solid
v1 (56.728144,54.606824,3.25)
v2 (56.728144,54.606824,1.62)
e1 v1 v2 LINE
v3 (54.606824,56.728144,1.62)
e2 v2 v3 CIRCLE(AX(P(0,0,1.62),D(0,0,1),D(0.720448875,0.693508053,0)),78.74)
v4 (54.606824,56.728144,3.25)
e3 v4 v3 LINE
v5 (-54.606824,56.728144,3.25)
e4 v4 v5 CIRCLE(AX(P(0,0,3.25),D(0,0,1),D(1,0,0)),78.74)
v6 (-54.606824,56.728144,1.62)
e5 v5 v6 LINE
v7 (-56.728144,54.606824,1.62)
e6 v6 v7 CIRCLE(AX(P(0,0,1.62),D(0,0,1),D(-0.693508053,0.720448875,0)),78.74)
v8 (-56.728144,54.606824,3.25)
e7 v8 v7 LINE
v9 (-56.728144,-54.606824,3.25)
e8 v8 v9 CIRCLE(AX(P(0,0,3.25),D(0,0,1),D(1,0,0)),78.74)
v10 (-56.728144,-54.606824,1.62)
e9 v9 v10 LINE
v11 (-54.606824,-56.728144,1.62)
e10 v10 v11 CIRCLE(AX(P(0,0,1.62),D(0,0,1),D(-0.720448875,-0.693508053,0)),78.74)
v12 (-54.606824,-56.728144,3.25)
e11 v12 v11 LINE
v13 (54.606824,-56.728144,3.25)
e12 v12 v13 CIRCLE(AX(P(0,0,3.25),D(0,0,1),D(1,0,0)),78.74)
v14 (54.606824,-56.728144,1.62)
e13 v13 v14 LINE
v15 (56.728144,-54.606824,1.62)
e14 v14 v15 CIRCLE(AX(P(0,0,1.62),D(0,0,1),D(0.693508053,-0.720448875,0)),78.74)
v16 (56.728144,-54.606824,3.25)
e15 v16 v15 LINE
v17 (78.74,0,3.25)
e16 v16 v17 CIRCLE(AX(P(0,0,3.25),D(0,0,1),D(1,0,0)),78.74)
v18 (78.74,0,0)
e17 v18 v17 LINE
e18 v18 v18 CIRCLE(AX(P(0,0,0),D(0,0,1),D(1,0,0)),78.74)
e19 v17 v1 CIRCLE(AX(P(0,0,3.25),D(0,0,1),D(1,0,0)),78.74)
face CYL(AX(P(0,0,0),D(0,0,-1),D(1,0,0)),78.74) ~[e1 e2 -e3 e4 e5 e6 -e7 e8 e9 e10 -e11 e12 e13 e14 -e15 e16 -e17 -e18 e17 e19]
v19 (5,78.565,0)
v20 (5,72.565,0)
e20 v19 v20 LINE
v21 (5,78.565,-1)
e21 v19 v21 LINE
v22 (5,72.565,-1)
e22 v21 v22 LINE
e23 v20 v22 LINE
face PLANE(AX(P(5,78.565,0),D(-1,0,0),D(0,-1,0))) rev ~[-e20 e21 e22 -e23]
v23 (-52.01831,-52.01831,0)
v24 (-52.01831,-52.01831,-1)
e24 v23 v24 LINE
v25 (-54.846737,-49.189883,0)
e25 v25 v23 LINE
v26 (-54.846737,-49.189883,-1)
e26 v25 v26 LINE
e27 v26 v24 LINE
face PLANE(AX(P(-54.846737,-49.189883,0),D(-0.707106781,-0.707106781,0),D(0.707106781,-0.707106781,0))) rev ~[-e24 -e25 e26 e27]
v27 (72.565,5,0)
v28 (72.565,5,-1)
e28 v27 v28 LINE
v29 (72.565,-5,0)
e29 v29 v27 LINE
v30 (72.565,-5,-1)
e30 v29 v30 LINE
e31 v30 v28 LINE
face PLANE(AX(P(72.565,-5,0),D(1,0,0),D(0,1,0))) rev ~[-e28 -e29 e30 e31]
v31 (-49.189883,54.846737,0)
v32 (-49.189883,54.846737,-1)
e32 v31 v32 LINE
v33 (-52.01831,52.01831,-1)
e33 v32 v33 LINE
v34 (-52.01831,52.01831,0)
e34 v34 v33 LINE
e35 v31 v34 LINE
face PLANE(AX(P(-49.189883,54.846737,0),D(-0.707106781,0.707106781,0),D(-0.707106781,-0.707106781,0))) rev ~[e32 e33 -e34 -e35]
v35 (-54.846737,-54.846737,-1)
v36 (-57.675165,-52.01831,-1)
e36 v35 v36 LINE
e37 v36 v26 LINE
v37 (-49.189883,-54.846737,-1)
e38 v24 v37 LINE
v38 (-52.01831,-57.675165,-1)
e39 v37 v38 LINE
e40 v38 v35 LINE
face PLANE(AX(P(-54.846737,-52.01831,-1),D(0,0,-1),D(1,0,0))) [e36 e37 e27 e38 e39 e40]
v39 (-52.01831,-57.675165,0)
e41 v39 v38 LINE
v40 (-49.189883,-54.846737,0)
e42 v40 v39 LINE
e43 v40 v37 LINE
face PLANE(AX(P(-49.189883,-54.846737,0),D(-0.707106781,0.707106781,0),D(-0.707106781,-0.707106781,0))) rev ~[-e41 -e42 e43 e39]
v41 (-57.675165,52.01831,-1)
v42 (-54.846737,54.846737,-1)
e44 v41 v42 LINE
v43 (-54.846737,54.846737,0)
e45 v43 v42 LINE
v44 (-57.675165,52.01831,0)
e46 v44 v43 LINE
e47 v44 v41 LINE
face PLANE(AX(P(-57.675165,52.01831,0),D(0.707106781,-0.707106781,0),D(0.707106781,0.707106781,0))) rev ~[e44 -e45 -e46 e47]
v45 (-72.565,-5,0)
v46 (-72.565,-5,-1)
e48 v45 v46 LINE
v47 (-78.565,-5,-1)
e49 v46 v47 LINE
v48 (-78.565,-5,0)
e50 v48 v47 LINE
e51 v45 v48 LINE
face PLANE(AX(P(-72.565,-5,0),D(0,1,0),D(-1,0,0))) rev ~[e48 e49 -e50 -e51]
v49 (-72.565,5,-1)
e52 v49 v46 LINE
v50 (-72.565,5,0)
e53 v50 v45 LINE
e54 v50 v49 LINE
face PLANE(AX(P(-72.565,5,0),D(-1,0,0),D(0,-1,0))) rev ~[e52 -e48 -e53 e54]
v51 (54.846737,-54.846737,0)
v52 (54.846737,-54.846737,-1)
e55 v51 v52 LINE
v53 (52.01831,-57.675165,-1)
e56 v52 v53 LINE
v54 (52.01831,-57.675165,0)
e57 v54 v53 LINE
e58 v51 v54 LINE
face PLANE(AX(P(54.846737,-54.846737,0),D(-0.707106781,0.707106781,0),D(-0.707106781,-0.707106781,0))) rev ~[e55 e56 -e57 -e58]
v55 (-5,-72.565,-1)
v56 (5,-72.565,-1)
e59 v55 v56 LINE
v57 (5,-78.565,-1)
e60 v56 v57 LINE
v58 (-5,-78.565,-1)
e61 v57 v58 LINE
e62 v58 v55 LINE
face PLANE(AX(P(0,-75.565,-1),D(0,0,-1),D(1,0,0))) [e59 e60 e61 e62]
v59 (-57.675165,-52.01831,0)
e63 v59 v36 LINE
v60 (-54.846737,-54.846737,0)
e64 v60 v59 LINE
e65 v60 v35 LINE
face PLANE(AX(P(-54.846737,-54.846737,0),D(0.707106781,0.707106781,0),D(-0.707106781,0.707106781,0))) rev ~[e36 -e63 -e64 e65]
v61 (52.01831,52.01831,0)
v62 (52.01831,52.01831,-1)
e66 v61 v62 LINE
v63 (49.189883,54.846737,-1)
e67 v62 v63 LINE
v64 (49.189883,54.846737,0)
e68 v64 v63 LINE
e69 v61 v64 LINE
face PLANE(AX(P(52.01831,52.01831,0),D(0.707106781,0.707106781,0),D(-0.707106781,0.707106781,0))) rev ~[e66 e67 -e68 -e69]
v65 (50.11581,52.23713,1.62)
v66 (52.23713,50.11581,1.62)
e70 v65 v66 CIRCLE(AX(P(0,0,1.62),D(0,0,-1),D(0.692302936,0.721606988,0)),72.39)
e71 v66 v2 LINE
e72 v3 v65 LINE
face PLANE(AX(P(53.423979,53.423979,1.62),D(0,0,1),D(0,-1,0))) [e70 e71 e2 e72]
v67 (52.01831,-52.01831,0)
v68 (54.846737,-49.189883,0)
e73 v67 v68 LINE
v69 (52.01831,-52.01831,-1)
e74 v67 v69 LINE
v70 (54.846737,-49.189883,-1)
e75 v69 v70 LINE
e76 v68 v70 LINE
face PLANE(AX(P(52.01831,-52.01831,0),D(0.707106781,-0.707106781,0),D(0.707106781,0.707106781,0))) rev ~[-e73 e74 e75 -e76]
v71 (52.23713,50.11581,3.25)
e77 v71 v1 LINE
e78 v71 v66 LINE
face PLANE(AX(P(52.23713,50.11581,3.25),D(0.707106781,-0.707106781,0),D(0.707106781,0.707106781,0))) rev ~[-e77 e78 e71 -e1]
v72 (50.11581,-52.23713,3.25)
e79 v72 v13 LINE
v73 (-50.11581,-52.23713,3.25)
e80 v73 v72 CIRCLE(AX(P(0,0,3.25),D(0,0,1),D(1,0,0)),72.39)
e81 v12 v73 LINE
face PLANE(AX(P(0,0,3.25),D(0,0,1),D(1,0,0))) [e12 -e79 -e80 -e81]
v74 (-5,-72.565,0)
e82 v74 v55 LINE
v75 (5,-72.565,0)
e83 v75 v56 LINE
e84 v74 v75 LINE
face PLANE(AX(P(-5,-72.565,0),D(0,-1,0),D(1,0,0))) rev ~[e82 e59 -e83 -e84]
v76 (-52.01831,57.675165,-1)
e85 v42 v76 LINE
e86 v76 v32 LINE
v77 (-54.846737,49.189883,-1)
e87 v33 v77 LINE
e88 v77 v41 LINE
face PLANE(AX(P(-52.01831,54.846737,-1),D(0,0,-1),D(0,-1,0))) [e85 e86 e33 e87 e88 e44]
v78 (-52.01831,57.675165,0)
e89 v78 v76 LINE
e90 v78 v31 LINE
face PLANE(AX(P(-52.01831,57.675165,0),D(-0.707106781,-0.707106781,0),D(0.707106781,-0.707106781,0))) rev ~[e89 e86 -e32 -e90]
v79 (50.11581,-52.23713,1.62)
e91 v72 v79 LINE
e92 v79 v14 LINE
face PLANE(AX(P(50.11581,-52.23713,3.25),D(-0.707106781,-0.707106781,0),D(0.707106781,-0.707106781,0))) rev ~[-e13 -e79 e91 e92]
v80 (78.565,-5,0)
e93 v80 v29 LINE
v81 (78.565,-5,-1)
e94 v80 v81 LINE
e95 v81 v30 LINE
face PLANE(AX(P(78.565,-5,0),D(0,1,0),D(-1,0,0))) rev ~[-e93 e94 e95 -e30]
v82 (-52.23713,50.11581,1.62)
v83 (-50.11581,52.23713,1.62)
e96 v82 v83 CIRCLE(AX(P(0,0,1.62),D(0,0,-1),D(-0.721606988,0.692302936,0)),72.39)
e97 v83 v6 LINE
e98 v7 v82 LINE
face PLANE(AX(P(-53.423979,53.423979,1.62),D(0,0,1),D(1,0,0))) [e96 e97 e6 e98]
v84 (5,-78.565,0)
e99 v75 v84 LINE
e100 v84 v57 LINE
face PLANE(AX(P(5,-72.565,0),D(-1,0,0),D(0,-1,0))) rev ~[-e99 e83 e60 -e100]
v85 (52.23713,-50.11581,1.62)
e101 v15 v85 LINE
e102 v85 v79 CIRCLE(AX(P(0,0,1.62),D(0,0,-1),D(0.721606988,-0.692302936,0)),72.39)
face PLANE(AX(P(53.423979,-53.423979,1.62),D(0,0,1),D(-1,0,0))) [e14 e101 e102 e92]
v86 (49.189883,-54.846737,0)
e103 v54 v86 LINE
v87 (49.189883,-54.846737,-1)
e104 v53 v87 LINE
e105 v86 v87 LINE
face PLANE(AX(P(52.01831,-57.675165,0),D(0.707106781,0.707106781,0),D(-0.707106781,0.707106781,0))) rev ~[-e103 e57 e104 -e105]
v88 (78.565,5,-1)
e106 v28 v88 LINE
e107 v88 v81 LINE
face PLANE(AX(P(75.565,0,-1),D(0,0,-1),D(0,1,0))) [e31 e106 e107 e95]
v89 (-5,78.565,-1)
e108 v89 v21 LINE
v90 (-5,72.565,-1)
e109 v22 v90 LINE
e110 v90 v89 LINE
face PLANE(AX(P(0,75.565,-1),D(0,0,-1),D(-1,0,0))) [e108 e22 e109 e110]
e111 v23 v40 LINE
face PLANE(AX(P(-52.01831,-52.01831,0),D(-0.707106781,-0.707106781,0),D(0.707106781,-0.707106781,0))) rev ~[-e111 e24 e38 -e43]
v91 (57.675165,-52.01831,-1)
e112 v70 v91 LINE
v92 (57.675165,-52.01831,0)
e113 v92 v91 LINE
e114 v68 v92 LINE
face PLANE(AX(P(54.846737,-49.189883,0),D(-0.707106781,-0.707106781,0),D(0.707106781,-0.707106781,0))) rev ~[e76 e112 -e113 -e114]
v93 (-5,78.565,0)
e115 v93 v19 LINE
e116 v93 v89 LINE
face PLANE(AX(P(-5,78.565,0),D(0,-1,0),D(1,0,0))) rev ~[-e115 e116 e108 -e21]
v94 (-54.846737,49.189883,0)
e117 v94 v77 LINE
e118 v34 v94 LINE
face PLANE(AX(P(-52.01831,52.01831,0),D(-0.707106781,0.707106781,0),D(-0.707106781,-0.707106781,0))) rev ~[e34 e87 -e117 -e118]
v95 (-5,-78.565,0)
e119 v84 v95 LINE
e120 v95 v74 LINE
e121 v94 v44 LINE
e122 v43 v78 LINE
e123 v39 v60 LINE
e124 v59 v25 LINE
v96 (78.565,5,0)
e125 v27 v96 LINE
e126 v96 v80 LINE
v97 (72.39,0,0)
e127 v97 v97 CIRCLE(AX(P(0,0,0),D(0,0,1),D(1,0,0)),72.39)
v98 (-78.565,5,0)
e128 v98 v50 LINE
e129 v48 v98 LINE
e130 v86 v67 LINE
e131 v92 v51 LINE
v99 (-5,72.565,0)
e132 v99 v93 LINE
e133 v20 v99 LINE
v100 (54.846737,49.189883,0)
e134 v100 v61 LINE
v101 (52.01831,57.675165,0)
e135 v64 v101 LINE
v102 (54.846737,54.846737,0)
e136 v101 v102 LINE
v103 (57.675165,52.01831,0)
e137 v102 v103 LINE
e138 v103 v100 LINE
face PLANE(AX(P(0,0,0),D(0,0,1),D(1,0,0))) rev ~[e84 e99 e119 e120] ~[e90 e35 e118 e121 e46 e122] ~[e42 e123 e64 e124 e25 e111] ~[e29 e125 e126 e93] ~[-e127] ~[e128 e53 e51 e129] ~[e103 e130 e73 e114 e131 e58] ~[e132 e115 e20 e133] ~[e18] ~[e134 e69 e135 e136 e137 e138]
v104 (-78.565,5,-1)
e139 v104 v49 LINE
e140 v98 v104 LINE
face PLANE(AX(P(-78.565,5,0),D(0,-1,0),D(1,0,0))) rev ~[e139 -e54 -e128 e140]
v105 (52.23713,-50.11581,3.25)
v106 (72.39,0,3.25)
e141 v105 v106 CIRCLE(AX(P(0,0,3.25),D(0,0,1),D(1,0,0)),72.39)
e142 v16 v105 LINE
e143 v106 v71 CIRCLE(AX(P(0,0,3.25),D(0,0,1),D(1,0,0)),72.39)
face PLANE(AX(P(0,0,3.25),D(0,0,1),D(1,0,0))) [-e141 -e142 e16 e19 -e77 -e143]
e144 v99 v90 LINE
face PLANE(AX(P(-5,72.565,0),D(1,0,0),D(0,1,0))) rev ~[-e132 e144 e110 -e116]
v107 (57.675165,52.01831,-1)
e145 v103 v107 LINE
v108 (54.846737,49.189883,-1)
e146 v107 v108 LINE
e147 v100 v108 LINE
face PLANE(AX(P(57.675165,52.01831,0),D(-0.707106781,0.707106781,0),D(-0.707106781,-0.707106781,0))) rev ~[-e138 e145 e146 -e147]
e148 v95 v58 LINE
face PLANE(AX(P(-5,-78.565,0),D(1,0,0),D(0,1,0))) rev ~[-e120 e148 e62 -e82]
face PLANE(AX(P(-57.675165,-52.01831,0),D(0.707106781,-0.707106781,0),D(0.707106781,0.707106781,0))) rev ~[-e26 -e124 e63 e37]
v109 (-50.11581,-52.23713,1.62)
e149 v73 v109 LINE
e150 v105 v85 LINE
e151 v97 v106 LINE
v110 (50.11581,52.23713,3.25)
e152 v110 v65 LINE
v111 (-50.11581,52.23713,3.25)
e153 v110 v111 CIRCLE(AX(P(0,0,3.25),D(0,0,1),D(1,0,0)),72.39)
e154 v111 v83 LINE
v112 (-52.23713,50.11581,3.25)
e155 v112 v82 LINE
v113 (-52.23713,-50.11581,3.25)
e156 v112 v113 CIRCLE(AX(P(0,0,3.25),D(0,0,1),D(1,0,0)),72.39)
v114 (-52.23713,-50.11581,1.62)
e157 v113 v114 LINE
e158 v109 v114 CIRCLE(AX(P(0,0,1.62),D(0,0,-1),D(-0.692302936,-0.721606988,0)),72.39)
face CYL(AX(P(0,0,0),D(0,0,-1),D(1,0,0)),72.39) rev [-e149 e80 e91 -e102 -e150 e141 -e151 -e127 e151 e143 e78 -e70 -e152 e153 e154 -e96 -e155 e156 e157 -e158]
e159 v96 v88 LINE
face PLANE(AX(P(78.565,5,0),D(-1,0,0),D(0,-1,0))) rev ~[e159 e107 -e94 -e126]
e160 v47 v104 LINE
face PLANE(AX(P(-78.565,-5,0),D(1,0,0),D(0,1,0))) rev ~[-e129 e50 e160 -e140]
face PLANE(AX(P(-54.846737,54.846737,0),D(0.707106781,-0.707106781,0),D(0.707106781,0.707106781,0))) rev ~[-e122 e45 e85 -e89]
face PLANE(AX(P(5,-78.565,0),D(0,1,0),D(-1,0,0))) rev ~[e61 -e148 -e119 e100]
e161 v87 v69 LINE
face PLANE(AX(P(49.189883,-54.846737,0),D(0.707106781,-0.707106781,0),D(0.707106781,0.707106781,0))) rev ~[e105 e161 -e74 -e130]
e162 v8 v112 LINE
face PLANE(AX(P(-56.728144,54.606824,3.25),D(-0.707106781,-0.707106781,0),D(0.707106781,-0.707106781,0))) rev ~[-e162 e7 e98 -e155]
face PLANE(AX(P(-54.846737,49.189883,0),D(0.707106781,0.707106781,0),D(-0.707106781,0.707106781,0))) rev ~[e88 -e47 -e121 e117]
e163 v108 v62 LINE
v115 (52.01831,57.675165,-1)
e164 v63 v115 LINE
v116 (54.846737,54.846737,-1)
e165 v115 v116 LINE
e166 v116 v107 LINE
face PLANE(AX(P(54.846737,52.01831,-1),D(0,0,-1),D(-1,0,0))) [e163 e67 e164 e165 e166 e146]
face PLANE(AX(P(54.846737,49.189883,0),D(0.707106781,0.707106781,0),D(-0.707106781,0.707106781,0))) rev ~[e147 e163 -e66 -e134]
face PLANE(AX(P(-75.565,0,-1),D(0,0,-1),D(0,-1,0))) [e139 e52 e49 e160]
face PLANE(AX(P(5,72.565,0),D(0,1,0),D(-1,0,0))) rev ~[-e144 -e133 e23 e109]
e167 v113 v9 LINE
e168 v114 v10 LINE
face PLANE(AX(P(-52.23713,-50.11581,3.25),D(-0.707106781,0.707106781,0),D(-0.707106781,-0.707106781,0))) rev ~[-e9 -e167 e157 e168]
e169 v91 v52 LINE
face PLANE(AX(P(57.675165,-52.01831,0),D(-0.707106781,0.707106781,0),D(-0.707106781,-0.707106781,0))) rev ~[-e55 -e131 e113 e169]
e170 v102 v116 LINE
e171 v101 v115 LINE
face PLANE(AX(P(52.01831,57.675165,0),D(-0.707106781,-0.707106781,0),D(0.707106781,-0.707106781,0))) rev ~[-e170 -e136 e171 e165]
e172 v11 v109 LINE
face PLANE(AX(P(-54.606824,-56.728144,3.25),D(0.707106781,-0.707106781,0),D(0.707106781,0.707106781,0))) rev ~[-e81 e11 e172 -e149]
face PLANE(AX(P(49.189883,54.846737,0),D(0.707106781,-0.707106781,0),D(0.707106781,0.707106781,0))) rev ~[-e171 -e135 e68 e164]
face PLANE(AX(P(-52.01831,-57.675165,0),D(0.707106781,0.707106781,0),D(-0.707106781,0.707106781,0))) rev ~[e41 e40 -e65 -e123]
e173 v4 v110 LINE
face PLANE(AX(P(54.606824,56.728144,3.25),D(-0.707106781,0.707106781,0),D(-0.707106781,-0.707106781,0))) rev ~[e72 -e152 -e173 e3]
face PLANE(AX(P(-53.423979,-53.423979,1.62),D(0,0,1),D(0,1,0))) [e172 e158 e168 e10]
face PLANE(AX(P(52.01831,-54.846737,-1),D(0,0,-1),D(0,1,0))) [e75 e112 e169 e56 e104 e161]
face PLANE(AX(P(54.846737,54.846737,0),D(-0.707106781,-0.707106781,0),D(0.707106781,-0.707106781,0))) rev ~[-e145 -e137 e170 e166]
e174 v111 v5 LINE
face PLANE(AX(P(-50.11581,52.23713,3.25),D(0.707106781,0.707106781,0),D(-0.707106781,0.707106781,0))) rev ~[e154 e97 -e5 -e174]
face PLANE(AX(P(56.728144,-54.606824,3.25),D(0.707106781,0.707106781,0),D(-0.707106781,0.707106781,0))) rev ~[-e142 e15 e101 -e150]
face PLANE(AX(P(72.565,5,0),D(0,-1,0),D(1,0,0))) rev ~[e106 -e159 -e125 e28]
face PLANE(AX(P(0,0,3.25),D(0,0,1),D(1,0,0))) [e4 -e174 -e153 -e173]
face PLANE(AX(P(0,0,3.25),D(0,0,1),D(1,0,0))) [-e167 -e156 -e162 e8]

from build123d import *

# Parameters (mm, degrees)
F0_R            = 78.74
F0_R_2          = 72.39
F1_DEPTH        = 3.25
F3_DEPTH        = 1.63
F3_COPIES_COUNT = 4
F6_DEPTH        = 1
F7_COUNT        = 4
F7_ANGLE        = 270
F9_DEPTH        = 1
F10_COUNT       = 4
F10_ANGLE       = 270


# Not quite as in the source:
# - a feature of the source that left no trace in its solid (it failed there, or was rolled back) is left out
# - a pattern or mirror of a feature is missing from the dataset's text; its kind, count and spacing are read off the source's solid


with BuildPart() as f1:
    # F0 (on Top) → F1 (new body)
    with BuildSketch(Plane.XY):
        Circle(F0_R)
        Circle(F0_R_2, mode=Mode.SUBTRACT)
    extrude(amount=F1_DEPTH)

    # F2 (on face) → F3 (cut)
    with BuildSketch(Plane.XY.offset(3.25)):
        with BuildLine():
            Line((-50.1158095189, 52.2371298624), (-54.6068240538, 56.7281443973))
            ThreePointArc((-54.6068240538, 56.7281443973), (-55.6775879506, 55.6775879506), (-56.7281443973, 54.6068240538))
            Line((-56.7281443973, 54.6068240538), (-52.2371298624, 50.1158095189))
            ThreePointArc((-52.2371298624, 50.1158095189), (-51.1874598901, 51.1874598901), (-50.1158095189, 52.2371298624))
        make_face()
    f3 = extrude(amount=-F3_DEPTH, mode=Mode.SUBTRACT)

    # F3_copies: F3 ×4 about axis
    f3_copies_axis = Axis((0, 0, 0), (0, 0, 1))
    for i in range(1, F3_COPIES_COUNT):
        add(f3.rotate(f3_copies_axis, i * 360 / F3_COPIES_COUNT), mode=Mode.SUBTRACT)

    # F5 (on face) → F6 (join)
    with BuildSketch(Plane(origin=(0, 0, 0), x_dir=(1, 0, 0), z_dir=(0, 0, -1))):
        Polygon((-54.8467374827, 49.1898832332), (-52.018310358, 52.018310358), (-54.8467374827, 54.8467374827), (-57.6751646075, 52.018310358), (-56.2609510451, 50.6040967956), align=None)
        Polygon((-54.8467374827, 54.8467374827), (-52.018310358, 52.018310358), (-49.1898832332, 54.8467374827), (-50.6040967956, 56.2609510451), (-52.018310358, 57.6751646075), align=None)
    f6 = extrude(amount=F6_DEPTH)

    # F7: F6 ×4 about axis
    f7_axis = Axis((0, 0, 0), (0, 0, -1))
    for i in range(1, F7_COUNT):
        add(f6.rotate(f7_axis, i * F7_ANGLE / (F7_COUNT - 1)))

    # F8 (on face) → F9 (join)
    with BuildSketch(Plane(origin=(0, 0, 0), x_dir=(1, 0, 0), z_dir=(0, 0, -1))):
        Polygon((-5, 78.565), (-5, 75.565), (-5, 72.565), (0, 72.565), (5, 72.565), (5, 75.565), (5, 78.565), (0, 78.565), align=None)
    f9 = extrude(amount=F9_DEPTH)

    # F10: F9 ×4 about axis
    f10_axis = Axis((0, 0, 0), (0, 0, 1))
    for i in range(1, F10_COUNT):
        add(f9.rotate(f10_axis, i * F10_ANGLE / (F10_COUNT - 1)))


solid = f1.part
